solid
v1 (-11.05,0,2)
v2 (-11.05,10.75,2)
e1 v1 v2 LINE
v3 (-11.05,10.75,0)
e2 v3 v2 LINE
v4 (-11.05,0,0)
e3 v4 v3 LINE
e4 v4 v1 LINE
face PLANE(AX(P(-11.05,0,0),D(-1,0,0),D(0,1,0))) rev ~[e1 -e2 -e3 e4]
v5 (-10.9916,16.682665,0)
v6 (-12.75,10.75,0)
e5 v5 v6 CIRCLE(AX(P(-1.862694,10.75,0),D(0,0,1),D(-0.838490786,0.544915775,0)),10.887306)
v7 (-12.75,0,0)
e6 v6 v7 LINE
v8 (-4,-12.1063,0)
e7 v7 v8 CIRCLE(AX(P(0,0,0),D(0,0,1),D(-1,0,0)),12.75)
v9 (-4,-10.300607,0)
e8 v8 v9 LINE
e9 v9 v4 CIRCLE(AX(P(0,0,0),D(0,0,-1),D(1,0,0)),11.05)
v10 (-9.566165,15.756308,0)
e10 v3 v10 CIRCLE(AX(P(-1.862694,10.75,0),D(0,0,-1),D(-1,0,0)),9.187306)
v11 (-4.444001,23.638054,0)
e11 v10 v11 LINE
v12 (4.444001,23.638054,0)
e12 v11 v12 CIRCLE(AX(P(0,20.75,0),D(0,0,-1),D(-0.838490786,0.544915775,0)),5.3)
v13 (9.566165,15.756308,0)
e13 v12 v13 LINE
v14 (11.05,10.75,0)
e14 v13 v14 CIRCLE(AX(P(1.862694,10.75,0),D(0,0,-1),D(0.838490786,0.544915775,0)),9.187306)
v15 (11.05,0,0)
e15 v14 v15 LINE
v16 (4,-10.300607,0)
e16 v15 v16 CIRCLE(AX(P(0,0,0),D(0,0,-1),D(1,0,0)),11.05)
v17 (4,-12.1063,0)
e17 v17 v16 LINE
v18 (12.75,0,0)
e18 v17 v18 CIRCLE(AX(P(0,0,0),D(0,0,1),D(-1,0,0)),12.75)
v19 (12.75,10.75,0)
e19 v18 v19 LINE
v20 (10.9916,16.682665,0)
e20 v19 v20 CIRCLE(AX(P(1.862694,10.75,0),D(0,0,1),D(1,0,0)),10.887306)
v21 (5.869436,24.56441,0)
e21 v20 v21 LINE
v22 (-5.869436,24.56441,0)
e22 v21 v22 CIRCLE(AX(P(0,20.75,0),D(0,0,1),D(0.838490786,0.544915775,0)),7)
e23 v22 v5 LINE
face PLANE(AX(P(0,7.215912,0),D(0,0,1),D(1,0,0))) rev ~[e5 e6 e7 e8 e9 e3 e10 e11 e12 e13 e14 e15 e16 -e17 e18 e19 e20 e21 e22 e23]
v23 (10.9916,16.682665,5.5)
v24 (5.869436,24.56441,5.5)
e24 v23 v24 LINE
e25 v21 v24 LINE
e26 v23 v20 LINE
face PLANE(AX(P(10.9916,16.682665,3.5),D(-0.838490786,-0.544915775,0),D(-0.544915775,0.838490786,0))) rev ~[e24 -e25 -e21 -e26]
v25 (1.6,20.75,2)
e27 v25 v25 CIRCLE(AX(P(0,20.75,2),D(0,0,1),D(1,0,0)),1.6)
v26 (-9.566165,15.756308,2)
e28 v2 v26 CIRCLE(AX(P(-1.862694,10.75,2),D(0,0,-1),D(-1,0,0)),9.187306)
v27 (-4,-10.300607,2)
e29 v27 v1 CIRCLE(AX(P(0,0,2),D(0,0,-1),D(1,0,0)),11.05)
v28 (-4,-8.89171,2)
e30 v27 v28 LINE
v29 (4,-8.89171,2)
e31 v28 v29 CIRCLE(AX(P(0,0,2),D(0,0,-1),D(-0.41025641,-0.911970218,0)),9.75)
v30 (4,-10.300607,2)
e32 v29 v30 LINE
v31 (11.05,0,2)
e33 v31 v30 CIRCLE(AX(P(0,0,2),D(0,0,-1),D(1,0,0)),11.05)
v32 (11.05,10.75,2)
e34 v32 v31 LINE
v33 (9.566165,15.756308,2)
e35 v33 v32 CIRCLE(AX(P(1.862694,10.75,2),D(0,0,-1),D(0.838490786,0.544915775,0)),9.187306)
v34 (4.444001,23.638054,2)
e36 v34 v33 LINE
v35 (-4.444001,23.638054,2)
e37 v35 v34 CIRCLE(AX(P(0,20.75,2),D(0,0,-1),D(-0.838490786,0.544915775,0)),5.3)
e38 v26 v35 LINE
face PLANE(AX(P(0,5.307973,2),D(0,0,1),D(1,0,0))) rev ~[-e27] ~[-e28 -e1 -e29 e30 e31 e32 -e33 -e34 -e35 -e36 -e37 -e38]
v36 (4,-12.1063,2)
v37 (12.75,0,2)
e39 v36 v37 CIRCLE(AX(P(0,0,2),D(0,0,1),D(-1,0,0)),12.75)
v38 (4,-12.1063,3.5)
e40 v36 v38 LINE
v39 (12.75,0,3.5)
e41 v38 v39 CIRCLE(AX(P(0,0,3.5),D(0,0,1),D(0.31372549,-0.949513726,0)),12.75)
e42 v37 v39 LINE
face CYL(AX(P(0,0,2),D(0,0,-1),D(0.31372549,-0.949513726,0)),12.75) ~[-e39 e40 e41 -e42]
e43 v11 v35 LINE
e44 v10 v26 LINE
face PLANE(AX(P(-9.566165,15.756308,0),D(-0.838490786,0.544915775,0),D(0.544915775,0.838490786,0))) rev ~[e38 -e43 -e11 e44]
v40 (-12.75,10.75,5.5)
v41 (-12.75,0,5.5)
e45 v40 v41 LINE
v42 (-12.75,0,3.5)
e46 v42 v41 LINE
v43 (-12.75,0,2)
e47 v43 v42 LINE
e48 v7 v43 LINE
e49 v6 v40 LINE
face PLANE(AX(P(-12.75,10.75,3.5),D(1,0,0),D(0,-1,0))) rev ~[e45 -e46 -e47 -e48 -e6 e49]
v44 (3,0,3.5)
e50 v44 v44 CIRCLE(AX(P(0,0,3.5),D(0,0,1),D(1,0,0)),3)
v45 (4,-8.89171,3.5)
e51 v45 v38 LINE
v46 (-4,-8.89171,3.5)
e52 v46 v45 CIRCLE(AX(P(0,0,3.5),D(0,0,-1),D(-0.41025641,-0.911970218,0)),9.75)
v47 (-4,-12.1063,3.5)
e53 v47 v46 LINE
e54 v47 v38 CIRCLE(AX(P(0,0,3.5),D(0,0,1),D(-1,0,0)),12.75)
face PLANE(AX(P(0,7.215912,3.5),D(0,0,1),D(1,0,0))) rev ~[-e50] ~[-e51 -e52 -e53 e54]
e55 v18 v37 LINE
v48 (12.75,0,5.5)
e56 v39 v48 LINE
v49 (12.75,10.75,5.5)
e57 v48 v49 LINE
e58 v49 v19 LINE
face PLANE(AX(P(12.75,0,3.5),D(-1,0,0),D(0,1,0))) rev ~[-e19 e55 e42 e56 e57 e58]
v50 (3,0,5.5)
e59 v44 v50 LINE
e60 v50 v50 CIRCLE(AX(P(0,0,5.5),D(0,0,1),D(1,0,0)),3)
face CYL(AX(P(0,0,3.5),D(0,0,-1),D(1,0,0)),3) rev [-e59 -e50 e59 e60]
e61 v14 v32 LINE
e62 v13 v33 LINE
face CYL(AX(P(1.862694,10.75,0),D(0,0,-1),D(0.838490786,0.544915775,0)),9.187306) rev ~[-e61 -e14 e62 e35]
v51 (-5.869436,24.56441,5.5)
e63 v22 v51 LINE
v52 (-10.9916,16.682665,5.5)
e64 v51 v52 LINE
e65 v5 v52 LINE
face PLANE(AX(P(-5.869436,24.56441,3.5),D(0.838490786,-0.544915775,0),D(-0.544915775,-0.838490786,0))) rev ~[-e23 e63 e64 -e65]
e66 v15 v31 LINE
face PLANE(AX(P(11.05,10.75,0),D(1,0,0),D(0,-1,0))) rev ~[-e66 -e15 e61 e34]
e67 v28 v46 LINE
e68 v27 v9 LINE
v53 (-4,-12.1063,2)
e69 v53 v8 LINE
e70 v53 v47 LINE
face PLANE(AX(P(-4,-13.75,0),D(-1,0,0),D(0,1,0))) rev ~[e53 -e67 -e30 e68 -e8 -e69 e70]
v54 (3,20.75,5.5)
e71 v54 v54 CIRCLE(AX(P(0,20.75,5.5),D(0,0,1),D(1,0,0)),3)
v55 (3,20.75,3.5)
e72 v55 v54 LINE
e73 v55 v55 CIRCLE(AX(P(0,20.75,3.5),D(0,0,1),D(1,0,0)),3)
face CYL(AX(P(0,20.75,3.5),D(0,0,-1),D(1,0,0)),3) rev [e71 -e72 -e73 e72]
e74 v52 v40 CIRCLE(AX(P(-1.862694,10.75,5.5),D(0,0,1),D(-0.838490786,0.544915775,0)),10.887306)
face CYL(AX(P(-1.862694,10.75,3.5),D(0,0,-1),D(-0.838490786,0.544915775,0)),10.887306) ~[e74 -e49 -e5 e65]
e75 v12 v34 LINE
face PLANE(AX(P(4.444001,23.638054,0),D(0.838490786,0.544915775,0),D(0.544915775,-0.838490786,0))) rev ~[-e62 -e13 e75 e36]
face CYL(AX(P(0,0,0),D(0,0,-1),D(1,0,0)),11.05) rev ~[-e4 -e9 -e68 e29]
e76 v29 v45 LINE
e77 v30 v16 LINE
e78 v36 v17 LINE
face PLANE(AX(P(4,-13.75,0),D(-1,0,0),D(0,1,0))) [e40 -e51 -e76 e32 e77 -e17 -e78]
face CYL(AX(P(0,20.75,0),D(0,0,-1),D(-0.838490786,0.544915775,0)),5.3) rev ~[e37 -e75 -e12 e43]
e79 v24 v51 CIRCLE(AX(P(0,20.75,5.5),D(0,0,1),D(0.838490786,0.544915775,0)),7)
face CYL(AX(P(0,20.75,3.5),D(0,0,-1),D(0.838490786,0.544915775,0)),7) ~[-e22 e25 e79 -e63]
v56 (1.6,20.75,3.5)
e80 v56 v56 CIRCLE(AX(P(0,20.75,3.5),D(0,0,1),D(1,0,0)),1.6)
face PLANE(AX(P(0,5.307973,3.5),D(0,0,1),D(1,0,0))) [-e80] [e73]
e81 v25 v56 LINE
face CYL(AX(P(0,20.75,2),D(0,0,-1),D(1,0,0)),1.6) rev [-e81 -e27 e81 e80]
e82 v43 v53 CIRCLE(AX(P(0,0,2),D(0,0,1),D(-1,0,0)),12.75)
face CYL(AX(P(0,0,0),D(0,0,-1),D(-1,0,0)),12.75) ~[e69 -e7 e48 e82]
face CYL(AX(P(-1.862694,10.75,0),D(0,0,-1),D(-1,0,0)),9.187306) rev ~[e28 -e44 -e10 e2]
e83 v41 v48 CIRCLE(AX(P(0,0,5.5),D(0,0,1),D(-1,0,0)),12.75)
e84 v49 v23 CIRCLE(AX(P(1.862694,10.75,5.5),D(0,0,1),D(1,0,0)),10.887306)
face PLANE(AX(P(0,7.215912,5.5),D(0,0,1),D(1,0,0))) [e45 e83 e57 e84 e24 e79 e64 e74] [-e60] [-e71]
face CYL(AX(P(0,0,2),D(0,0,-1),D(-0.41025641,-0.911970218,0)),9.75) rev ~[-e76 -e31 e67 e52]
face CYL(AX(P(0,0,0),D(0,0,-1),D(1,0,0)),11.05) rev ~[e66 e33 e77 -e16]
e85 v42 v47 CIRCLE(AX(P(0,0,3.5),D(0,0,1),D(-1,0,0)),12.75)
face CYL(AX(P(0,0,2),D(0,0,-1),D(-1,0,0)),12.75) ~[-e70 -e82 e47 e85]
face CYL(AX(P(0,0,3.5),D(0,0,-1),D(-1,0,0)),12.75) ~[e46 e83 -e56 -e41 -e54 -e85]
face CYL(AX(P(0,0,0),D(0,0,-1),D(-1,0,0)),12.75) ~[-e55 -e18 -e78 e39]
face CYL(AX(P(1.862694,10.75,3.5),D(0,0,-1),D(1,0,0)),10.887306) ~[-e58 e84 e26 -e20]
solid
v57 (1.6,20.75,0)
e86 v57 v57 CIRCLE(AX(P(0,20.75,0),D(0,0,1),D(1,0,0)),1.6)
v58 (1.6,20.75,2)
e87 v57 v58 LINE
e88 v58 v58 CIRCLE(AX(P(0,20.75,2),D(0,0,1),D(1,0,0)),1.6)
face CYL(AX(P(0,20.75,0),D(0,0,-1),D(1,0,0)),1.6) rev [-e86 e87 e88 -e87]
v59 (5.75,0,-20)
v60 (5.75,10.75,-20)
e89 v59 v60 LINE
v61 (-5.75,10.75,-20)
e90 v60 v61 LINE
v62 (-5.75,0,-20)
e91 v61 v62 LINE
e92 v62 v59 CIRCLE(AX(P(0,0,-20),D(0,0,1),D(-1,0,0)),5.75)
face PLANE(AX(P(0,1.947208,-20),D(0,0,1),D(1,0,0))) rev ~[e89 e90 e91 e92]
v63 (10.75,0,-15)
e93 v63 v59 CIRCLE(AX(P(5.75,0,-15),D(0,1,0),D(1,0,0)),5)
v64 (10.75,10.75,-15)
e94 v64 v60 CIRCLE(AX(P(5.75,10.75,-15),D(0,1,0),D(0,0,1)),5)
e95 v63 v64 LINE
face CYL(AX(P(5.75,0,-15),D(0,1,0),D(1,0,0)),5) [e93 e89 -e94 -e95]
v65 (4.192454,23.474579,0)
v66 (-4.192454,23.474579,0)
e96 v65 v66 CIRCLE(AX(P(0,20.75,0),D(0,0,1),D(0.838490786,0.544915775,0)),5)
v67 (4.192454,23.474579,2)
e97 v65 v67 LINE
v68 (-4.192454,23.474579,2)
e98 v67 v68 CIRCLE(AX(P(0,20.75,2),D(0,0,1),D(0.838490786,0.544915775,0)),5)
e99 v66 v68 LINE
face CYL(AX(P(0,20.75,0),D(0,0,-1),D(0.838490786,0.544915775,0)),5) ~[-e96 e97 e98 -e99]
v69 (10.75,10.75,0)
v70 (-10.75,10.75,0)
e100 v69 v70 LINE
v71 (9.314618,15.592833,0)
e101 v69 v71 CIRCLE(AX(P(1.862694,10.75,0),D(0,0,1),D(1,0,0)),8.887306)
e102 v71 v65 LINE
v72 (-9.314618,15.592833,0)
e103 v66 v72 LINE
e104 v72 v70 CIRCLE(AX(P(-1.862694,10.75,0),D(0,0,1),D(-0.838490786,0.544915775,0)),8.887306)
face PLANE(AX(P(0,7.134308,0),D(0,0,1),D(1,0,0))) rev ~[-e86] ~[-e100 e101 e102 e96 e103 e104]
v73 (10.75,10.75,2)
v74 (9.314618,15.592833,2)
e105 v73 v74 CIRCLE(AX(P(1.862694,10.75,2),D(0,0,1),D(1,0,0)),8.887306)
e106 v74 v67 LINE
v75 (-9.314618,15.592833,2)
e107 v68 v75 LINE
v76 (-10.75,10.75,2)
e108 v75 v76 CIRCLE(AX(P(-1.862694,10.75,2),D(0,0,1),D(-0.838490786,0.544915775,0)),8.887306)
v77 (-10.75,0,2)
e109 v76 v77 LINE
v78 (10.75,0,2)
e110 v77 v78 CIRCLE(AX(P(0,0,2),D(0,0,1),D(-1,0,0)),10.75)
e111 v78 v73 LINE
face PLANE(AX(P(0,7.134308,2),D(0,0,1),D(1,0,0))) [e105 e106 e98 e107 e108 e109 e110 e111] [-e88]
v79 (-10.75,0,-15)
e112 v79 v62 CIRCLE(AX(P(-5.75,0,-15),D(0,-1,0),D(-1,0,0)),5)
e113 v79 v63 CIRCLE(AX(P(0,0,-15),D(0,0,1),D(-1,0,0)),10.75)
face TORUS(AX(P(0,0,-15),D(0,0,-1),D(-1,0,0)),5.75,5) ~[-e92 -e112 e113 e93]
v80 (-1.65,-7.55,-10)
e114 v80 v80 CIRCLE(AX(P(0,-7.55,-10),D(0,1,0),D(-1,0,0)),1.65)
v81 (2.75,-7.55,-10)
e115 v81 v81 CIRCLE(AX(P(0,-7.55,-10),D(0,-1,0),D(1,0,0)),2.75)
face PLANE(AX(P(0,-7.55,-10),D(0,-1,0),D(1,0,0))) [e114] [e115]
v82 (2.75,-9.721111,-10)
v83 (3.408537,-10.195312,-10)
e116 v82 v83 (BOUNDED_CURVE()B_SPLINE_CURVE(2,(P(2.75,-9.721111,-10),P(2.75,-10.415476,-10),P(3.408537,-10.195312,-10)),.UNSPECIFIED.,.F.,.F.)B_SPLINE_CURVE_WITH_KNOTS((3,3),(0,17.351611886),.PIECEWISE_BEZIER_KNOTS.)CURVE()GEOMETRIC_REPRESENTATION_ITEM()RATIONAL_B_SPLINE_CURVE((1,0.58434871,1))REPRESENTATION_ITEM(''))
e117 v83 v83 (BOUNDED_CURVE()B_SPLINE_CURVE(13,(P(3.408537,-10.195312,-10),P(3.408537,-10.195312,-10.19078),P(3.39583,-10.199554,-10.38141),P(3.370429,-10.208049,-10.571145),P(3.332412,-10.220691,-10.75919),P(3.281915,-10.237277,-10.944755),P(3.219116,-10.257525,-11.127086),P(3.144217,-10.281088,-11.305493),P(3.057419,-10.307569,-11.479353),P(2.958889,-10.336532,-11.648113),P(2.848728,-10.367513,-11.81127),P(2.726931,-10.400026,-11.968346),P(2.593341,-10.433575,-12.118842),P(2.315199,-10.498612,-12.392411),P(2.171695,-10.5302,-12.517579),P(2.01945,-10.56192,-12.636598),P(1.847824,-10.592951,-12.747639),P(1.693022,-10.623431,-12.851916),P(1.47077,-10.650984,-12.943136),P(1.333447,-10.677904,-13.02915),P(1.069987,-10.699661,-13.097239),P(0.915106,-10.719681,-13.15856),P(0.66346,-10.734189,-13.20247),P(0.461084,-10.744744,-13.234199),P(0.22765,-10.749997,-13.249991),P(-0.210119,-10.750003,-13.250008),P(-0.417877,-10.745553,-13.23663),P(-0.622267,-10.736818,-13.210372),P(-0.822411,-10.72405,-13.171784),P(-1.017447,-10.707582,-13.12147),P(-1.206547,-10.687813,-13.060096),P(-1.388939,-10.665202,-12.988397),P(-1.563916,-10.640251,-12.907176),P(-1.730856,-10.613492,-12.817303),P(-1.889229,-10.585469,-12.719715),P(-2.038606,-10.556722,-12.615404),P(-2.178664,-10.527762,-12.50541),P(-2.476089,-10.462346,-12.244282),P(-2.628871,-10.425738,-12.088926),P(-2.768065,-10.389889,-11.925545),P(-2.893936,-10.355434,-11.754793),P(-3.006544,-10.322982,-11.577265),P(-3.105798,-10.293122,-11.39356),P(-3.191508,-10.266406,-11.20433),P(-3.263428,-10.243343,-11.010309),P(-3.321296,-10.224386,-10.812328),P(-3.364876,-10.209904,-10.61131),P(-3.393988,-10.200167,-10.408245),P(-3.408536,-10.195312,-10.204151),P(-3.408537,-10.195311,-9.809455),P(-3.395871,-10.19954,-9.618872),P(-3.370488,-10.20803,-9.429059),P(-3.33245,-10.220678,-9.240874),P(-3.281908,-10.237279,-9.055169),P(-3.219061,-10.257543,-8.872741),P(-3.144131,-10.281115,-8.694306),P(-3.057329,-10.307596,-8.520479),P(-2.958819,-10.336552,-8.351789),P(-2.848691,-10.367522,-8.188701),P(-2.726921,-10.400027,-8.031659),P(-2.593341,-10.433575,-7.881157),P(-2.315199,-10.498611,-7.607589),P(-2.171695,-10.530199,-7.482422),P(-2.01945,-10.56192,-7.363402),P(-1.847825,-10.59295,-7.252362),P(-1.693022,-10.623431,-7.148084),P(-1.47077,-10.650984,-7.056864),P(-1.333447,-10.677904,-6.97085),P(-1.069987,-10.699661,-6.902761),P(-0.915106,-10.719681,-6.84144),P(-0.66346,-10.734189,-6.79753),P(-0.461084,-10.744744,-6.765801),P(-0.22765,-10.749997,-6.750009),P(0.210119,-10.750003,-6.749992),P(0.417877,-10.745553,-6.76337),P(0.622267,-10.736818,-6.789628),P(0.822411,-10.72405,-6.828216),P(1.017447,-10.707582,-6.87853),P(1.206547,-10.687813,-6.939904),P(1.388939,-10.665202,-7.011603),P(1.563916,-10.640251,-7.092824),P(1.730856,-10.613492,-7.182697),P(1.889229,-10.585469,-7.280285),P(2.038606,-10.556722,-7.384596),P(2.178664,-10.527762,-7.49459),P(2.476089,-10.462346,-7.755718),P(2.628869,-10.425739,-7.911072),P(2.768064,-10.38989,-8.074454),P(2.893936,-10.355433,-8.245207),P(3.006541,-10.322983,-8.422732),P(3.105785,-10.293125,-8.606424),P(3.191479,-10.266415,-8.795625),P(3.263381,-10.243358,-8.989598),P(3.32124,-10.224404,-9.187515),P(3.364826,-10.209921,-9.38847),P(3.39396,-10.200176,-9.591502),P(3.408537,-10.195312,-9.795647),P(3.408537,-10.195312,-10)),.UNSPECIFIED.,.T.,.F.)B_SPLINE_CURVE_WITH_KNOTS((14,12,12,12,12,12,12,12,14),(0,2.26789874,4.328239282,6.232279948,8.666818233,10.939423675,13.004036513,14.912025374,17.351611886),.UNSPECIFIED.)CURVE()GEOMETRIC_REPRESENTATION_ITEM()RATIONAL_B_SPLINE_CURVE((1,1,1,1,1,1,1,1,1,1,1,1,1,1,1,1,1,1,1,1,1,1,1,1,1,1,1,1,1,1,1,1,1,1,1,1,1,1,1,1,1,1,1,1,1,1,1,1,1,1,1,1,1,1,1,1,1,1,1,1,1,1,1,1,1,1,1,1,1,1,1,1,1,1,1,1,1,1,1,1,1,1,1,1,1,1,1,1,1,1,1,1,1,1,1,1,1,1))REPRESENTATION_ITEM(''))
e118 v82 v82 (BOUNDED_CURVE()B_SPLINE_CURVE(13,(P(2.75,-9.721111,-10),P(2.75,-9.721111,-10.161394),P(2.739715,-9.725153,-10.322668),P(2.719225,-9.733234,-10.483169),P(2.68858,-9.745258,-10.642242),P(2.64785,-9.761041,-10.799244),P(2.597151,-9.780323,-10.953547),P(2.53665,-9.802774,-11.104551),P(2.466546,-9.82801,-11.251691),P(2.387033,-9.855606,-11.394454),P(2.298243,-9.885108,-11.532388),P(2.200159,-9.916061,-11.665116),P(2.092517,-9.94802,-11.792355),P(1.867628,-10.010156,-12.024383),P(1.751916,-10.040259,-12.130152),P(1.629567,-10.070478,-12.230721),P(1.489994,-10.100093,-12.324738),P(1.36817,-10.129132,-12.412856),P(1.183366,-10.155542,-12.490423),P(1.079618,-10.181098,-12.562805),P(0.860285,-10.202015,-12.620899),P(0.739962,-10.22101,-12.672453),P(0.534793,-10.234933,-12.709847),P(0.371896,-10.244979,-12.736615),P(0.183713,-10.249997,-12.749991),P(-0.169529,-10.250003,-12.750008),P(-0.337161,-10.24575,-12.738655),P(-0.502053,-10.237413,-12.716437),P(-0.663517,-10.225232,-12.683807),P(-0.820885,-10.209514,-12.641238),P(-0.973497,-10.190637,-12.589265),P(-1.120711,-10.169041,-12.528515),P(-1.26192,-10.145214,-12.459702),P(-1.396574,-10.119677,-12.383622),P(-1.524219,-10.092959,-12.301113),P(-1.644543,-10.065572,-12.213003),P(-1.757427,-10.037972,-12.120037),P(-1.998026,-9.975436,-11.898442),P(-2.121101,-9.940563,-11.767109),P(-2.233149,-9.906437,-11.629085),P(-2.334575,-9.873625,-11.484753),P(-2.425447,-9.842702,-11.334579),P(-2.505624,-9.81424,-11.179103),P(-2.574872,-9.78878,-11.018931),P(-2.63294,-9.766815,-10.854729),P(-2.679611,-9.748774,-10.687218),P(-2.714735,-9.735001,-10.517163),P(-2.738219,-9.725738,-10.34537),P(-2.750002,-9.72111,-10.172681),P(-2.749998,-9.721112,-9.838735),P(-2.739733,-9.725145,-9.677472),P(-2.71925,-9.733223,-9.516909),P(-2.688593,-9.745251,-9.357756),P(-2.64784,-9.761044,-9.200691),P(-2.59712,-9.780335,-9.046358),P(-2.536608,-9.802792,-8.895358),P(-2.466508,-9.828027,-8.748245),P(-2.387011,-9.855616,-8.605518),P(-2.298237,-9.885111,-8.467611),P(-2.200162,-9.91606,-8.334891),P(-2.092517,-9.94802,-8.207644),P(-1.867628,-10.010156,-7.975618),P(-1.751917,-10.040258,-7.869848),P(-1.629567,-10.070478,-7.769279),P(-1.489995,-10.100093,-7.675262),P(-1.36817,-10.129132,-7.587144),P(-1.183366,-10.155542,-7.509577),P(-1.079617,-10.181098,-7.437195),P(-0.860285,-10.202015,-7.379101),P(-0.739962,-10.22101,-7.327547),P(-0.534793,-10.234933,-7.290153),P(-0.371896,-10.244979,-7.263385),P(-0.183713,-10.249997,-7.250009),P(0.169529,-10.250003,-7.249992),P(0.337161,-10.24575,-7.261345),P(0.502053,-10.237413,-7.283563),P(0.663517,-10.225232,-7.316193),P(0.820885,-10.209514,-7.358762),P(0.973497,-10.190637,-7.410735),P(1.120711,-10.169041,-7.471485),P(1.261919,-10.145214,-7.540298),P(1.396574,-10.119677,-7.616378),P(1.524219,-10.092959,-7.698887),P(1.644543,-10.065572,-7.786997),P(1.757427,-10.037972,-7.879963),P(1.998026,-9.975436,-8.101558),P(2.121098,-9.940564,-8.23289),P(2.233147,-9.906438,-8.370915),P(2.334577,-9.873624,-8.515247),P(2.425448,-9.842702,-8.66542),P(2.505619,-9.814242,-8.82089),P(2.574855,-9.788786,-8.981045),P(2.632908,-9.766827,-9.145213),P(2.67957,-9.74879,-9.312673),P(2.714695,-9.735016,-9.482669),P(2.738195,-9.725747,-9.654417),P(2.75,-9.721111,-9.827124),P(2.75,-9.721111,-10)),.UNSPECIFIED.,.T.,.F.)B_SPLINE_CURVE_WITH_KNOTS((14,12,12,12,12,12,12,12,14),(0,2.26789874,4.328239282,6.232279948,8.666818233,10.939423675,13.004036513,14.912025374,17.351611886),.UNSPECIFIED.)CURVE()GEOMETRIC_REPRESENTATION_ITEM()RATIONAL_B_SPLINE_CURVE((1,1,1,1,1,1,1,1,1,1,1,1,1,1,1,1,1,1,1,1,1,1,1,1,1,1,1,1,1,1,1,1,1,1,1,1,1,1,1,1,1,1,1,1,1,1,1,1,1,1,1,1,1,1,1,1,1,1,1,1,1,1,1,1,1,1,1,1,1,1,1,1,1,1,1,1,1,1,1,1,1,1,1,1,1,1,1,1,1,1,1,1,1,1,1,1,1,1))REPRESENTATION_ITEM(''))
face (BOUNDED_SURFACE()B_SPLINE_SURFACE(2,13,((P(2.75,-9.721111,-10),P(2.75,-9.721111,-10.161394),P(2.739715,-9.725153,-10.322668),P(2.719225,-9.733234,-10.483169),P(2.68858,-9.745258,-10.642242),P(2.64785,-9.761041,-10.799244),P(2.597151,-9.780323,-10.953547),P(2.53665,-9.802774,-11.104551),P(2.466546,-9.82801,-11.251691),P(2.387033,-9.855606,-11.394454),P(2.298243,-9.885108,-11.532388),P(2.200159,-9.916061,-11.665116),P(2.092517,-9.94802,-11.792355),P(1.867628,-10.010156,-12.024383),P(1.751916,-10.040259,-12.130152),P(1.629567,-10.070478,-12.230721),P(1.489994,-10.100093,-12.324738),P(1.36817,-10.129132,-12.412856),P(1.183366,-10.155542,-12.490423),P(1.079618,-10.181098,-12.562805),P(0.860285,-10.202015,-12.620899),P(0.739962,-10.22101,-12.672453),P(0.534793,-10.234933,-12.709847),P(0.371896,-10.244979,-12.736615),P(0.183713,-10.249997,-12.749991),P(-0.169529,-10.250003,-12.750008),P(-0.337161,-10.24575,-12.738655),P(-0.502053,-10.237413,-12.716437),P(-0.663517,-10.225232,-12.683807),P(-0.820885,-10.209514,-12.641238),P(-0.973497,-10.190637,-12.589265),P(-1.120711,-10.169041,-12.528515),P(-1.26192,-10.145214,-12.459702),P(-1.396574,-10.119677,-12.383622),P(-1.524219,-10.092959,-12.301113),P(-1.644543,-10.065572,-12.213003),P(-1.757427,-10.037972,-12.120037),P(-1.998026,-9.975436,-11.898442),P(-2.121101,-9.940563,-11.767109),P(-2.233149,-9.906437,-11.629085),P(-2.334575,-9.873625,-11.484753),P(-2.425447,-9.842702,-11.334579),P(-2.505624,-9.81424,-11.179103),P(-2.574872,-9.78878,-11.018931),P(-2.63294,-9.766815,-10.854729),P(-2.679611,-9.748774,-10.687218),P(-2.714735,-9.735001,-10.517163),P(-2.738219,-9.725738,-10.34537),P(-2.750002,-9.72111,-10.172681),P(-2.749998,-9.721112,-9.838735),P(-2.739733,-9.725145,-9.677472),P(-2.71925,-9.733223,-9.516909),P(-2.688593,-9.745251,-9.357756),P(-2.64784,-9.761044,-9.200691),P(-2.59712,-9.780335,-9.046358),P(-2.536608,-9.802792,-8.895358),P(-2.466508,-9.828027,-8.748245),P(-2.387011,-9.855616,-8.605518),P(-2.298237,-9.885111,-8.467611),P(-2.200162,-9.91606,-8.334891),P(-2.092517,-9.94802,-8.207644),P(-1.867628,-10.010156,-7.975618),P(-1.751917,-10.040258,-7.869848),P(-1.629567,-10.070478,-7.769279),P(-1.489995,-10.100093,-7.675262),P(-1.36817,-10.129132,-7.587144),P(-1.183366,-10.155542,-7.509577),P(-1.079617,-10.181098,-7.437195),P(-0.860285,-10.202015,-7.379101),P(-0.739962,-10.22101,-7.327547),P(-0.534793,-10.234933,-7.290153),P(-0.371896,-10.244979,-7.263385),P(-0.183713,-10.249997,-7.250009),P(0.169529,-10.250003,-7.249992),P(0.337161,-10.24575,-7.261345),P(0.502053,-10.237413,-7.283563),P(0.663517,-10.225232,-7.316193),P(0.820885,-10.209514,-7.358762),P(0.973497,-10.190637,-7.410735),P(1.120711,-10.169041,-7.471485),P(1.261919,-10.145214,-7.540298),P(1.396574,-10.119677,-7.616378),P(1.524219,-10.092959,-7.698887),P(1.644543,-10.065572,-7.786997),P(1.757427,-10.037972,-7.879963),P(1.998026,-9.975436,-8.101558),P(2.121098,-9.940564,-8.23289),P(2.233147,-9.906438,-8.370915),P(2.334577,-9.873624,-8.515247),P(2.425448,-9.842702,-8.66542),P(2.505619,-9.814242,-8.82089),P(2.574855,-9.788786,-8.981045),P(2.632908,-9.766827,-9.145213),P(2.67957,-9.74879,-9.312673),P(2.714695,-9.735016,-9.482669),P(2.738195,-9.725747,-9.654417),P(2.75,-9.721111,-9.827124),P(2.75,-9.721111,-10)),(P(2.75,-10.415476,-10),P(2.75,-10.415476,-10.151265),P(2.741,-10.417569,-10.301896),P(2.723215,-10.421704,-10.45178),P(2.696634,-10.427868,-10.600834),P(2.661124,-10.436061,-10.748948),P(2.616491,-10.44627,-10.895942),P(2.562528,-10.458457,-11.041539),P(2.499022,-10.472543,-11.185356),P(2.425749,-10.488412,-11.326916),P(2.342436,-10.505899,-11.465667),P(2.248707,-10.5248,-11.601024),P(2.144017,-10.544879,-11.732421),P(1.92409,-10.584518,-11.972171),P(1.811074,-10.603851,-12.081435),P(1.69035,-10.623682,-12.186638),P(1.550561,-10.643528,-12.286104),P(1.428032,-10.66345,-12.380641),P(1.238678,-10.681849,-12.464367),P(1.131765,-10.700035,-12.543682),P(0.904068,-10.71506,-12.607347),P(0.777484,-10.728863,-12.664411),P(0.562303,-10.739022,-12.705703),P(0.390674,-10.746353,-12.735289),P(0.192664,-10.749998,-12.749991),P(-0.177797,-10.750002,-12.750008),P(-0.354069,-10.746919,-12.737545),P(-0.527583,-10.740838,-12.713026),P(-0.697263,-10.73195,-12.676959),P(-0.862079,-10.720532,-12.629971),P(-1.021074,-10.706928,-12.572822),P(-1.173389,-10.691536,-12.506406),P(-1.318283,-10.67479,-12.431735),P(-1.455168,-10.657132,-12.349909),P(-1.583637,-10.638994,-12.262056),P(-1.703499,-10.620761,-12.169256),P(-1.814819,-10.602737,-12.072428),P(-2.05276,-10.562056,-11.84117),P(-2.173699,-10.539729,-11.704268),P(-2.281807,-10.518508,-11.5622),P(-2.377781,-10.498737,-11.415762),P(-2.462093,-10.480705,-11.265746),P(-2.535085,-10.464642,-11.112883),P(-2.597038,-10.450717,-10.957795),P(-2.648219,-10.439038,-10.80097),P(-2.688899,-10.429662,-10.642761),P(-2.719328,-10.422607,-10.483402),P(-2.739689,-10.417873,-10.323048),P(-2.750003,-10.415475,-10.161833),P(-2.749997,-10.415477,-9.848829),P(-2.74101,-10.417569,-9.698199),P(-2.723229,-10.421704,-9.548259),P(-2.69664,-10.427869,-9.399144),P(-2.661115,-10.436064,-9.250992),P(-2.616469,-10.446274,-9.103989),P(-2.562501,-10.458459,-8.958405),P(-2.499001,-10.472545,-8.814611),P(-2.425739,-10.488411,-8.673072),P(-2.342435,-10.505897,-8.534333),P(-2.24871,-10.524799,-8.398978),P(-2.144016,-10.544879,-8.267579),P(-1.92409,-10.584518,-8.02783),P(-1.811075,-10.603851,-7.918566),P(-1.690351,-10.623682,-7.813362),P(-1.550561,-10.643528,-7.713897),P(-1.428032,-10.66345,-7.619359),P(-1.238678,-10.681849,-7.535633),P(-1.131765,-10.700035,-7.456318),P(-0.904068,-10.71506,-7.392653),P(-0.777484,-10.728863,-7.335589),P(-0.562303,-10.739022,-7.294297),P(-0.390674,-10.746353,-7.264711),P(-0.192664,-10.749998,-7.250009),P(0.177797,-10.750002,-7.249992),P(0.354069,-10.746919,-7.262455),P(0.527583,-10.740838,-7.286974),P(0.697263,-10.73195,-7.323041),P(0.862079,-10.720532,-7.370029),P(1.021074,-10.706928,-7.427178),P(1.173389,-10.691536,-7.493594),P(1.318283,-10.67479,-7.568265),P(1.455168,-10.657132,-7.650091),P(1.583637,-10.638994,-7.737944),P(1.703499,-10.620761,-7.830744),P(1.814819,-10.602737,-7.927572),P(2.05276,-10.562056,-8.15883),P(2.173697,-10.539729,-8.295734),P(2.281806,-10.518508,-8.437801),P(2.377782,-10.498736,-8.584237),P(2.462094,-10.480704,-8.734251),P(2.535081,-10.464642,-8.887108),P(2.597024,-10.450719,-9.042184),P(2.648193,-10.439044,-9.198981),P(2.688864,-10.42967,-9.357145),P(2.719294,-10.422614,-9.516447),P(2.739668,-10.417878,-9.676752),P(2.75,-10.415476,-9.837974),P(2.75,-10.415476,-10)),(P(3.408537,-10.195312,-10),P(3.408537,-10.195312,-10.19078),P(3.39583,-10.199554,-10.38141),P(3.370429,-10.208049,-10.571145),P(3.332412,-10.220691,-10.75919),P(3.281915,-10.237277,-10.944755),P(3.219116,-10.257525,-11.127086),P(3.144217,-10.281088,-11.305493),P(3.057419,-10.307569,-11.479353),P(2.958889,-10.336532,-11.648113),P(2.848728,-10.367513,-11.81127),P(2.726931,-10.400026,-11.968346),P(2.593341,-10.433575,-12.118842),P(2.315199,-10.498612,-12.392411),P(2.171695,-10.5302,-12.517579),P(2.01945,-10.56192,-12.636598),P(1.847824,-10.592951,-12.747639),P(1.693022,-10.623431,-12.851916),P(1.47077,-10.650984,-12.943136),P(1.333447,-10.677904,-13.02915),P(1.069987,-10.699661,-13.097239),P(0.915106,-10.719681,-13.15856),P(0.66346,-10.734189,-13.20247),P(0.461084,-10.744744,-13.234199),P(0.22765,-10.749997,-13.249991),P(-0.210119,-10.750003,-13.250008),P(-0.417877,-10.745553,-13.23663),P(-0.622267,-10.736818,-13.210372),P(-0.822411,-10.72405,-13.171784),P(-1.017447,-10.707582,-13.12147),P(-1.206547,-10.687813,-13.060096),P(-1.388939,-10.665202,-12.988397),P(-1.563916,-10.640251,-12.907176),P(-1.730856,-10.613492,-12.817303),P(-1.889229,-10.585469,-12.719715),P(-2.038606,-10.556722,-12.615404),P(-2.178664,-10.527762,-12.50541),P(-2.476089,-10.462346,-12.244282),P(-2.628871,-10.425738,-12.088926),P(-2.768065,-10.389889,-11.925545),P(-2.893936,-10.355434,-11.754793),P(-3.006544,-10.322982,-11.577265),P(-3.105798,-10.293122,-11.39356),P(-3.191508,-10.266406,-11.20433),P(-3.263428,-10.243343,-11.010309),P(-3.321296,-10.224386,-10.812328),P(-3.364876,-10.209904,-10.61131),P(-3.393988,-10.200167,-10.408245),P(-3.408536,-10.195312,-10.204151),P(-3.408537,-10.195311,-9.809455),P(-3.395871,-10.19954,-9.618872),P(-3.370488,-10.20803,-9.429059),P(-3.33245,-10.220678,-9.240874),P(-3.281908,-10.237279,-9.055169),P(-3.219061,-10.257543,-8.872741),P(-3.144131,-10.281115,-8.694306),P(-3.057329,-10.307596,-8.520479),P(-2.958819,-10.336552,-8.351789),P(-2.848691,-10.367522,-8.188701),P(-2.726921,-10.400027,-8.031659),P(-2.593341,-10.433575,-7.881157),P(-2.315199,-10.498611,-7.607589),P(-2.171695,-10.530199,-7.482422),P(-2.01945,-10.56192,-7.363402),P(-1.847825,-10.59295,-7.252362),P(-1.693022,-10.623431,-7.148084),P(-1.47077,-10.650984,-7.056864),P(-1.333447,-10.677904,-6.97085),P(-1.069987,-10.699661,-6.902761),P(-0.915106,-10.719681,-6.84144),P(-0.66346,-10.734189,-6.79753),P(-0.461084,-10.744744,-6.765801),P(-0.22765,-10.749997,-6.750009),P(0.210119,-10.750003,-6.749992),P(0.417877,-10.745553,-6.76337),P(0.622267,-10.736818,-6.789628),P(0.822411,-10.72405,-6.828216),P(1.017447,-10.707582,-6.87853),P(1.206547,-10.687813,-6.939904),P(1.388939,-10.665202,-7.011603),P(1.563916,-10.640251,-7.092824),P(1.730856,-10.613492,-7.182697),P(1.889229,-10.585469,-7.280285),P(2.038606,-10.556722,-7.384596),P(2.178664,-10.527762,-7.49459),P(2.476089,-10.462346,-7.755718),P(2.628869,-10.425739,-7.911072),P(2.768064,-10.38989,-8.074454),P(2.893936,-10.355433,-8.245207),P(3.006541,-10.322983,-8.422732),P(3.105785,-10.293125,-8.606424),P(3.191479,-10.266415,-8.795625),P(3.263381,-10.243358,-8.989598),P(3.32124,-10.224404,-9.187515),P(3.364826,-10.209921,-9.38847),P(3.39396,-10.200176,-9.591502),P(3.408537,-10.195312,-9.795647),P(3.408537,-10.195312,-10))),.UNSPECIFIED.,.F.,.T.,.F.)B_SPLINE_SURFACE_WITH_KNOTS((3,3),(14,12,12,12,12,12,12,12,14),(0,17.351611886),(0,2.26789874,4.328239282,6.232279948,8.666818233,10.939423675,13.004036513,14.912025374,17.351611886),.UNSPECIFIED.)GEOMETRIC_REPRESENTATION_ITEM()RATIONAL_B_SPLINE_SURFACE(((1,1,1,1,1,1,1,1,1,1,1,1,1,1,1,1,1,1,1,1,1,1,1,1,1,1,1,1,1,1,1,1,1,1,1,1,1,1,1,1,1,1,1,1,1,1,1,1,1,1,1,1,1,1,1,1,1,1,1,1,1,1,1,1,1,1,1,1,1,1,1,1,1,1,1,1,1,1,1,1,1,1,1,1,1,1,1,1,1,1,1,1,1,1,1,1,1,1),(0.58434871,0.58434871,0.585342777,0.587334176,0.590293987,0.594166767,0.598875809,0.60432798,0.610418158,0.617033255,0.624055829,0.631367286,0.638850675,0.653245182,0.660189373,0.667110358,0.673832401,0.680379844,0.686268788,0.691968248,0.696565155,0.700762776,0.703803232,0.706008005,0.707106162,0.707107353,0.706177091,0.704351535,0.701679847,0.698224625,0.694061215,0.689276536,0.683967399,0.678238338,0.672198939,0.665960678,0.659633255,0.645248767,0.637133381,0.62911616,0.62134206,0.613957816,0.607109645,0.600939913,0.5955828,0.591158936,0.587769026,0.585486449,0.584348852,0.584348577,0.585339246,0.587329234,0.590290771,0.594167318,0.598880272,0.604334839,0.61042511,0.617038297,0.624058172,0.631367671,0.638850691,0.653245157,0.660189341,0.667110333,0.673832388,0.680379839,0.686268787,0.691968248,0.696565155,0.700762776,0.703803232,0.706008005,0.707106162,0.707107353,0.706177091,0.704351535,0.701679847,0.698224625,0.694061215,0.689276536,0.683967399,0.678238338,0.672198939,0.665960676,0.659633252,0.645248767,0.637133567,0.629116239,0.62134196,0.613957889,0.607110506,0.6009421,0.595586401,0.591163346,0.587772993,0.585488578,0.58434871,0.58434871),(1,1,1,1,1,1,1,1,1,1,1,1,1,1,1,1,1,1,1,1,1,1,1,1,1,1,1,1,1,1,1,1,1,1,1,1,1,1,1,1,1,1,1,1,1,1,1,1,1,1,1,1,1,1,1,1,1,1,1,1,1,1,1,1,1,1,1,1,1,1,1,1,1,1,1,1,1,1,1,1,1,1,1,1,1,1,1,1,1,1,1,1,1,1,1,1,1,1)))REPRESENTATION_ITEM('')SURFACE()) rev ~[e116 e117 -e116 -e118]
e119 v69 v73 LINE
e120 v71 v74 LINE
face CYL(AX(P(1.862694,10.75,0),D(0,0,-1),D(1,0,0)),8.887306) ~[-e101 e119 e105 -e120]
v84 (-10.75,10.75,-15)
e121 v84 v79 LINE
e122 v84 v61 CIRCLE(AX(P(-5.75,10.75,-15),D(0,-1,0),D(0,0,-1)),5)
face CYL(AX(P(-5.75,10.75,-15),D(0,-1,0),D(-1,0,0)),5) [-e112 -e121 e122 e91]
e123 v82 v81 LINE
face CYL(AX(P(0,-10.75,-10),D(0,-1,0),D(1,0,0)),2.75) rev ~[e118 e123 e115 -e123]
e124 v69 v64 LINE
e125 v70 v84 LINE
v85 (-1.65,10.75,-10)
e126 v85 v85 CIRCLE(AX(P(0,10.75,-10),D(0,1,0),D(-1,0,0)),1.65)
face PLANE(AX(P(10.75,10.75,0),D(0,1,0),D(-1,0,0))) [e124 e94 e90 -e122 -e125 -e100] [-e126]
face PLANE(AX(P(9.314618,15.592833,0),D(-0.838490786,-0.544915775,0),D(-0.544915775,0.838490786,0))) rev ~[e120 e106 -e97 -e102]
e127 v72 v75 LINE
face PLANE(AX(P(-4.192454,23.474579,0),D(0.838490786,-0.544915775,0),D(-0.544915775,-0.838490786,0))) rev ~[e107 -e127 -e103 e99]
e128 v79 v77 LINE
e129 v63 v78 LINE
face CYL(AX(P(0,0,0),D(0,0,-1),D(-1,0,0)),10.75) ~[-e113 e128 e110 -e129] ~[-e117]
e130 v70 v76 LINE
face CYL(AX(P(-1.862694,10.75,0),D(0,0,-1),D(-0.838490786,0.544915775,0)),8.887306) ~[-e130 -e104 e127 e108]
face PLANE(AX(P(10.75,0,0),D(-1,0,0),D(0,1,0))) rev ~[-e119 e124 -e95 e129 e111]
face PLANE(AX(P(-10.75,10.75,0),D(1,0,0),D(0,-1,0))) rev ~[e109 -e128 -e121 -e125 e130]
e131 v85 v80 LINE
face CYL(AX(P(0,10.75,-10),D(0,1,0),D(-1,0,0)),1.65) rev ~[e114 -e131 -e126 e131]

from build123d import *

# Parameters (mm, degrees)
F1_DEPTH  = 20
F2_R      = 1.6
F3_DEPTH  = 2
F4_R      = 1.65
F5_DEPTH  = 30
F8_R      = 2.75
F9_DEPTH  = 3.2
F10_R     = 0.5
F11_R     = 5
F13_DEPTH = 2
F14_R     = 1.6
F15_DEPTH = 1.5
F16_R     = 3
F17_DEPTH = 2
F18_W     = 8
F18_H     = 4.8582903781
F19_DEPTH = 2


# Not quite as in the source:
# - a feature names something its author has since deleted; it is built from what else it names


with BuildPart() as f1:
    # F0 (on Top) → F1 (new body)
    with BuildSketch(Plane.XY):
        with BuildLine():
            Line((10.75, 10.75), (-10.75, 10.75))
            Line((-10.75, 10.75), (-10.75, 0))
            ThreePointArc((-10.75, 0), (0, -10.75), (10.75, 0))
            Line((10.75, 0), (10.75, 10.75))
        make_face()
    extrude(amount=-F1_DEPTH)

    # F2 (on face) → F3 (join)
    with BuildSketch(Plane.XY):
        with BuildLine():
            Line((-10.75, 10.75), (-10.75, 0))
            ThreePointArc((-10.75, 0), (0, -10.75), (10.75, 0))
            Line((10.75, 0), (10.75, 10.75))
            ThreePointArc((10.75, 10.75), (10.383601773, 13.2755372984), (9.3146181955, 15.5928332263))
            Line((9.3146181955, 15.5928332263), (4.1924539291, 23.4745788761))
            ThreePointArc((4.1924539291, 23.4745788761), (0, 25.75), (-4.1924539291, 23.4745788761))
            Line((-4.1924539291, 23.4745788761), (-9.3146181955, 15.5928332263))
            ThreePointArc((-9.3146181955, 15.5928332263), (-10.383601773, 13.2755372984), (-10.75, 10.75))
        make_face()
        with Locations((0, 20.75)):
            Circle(F2_R, mode=Mode.SUBTRACT)
    extrude(amount=F3_DEPTH)

    # F4 (on face) → F5 (cut)
    with BuildSketch(Plane(origin=(0, 10.75, 0), x_dir=(-1, 0, 0), z_dir=(0, 1, 0))):
        with Locations((0, -10)):
            Circle(F4_R)
    extrude(amount=-F5_DEPTH, mode=Mode.SUBTRACT)

    # F8 (on plane+point) → F9 (cut)
    with BuildSketch(Plane.XZ.offset(10.75)):
        with Locations((0, -10)):
            Circle(F8_R)
    extrude(amount=-F9_DEPTH, mode=Mode.SUBTRACT)

    # F10
    f10_edges = [f1.edges().sort_by_distance(p)[0] for p in [
        (-2.749989, -10.392308, -9.992207),
    ]]
    fillet(f10_edges, radius=F10_R)

    # F11
    f11_edges = [f1.edges().sort_by_distance(p)[0] for p in [
        (0, -10.75, -20),
        (10.75, 5.375, -20),
        (-10.75, 5.375, -20),
    ]]
    fillet(f11_edges, radius=F11_R)


with BuildPart() as f13:
    # F12 (on Top) → F13 (new body)
    with BuildSketch(Plane.XY):
        with BuildLine():
            Line((-12.75, 10.75), (-12.75, 0))
            ThreePointArc((-12.75, 0), (0, -12.75), (12.75, 0))
            Line((12.75, 0), (12.75, 10.75))
            ThreePointArc((12.75, 10.75), (12.3011474886, 13.8438844004), (10.9915997671, 16.6826647767))
            Line((10.9915997671, 16.6826647767), (5.8694355008, 24.5644104265))
            ThreePointArc((5.8694355008, 24.5644104265), (0, 27.75), (-5.8694355008, 24.5644104265))
            Line((-5.8694355008, 24.5644104265), (-10.9915997671, 16.6826647767))
            ThreePointArc((-10.9915997671, 16.6826647767), (-12.3011474886, 13.8438844004), (-12.75, 10.75))
        make_face()
        with BuildLine():
            ThreePointArc((11.05, 0), (0, -11.05), (-11.05, 0))
            Line((-11.05, 0), (-11.05, 10.75))
            ThreePointArc((-11.05, 10.75), (-10.6712336303, 13.3607893637), (-9.5661654312, 15.7563079588))
            Line((-9.5661654312, 15.7563079588), (-4.4440011649, 23.6380536087))
            ThreePointArc((-4.4440011649, 23.6380536087), (0, 26.05), (4.4440011649, 23.6380536087))
            Line((4.4440011649, 23.6380536087), (9.5661654312, 15.7563079588))
            ThreePointArc((9.5661654312, 15.7563079588), (10.6712336303, 13.3607893637), (11.05, 10.75))
            Line((11.05, 10.75), (11.05, 0))
        make_face(mode=Mode.SUBTRACT)
    extrude(amount=F13_DEPTH)

    # F14 (on face) → F15 (join)
    with BuildSketch(Plane.XY.offset(2)):
        with BuildLine():
            Line((10.9915997671, 16.6826647767), (5.8694355008, 24.5644104265))
            ThreePointArc((5.8694355008, 24.5644104265), (0, 27.75), (-5.8694355008, 24.5644104265))
            Line((-5.8694355008, 24.5644104265), (-10.9915997671, 16.6826647767))
            ThreePointArc((-10.9915997671, 16.6826647767), (-12.3011474886, 13.8438844004), (-12.75, 10.75))
            Line((-12.75, 10.75), (-12.75, 0))
            ThreePointArc((-12.75, 0), (-10.3335013427, -7.4686846231), (-4, -12.1063000128))
            Line((-4, -12.1063000128), (-4, -8.8917096219))
            ThreePointArc((-4, -8.8917096219), (0, 9.75), (4, -8.8917096219))
            Line((4, -8.8917096219), (4, -12.1063000128))
            ThreePointArc((4, -12.1063000128), (10.3335013427, -7.4686846231), (12.75, 0))
            Line((12.75, 0), (12.75, 10.75))
            ThreePointArc((12.75, 10.75), (12.3011474886, 13.8438844004), (10.9915997671, 16.6826647767))
        make_face()
        with Locations((0, 20.75)):
            Circle(F14_R, mode=Mode.SUBTRACT)
    extrude(amount=F15_DEPTH)

    # F16 (on face) → F17 (join)
    with BuildSketch(Plane.XY.offset(3.5)):
        with BuildLine():
            Line((10.9915997671, 16.6826647767), (5.8694355008, 24.5644104265))
            ThreePointArc((5.8694355008, 24.5644104265), (0, 27.75), (-5.8694355008, 24.5644104265))
            Line((-5.8694355008, 24.5644104265), (-10.9915997671, 16.6826647767))
            ThreePointArc((-10.9915997671, 16.6826647767), (-12.3011474886, 13.8438844004), (-12.75, 10.75))
            Line((-12.75, 10.75), (-12.75, 0))
            ThreePointArc((-12.75, 0), (0, -12.75), (12.75, 0))
            Line((12.75, 0), (12.75, 10.75))
            ThreePointArc((12.75, 10.75), (12.3011474886, 13.8438844004), (10.9915997671, 16.6826647767))
        make_face()
        Circle(F16_R, mode=Mode.SUBTRACT)
        with Locations((0, 20.75)):
            Circle(F16_R, mode=Mode.SUBTRACT)
    extrude(amount=F17_DEPTH)

    # F18 (on face) → F19 (cut, through all)
    with BuildSketch(Plane.XY):
        with Locations((0, -11.3208548109)):
            Rectangle(F18_W, F18_H)
    extrude(amount=F19_DEPTH, mode=Mode.SUBTRACT)


solid = Compound([f1.part, f13.part])
